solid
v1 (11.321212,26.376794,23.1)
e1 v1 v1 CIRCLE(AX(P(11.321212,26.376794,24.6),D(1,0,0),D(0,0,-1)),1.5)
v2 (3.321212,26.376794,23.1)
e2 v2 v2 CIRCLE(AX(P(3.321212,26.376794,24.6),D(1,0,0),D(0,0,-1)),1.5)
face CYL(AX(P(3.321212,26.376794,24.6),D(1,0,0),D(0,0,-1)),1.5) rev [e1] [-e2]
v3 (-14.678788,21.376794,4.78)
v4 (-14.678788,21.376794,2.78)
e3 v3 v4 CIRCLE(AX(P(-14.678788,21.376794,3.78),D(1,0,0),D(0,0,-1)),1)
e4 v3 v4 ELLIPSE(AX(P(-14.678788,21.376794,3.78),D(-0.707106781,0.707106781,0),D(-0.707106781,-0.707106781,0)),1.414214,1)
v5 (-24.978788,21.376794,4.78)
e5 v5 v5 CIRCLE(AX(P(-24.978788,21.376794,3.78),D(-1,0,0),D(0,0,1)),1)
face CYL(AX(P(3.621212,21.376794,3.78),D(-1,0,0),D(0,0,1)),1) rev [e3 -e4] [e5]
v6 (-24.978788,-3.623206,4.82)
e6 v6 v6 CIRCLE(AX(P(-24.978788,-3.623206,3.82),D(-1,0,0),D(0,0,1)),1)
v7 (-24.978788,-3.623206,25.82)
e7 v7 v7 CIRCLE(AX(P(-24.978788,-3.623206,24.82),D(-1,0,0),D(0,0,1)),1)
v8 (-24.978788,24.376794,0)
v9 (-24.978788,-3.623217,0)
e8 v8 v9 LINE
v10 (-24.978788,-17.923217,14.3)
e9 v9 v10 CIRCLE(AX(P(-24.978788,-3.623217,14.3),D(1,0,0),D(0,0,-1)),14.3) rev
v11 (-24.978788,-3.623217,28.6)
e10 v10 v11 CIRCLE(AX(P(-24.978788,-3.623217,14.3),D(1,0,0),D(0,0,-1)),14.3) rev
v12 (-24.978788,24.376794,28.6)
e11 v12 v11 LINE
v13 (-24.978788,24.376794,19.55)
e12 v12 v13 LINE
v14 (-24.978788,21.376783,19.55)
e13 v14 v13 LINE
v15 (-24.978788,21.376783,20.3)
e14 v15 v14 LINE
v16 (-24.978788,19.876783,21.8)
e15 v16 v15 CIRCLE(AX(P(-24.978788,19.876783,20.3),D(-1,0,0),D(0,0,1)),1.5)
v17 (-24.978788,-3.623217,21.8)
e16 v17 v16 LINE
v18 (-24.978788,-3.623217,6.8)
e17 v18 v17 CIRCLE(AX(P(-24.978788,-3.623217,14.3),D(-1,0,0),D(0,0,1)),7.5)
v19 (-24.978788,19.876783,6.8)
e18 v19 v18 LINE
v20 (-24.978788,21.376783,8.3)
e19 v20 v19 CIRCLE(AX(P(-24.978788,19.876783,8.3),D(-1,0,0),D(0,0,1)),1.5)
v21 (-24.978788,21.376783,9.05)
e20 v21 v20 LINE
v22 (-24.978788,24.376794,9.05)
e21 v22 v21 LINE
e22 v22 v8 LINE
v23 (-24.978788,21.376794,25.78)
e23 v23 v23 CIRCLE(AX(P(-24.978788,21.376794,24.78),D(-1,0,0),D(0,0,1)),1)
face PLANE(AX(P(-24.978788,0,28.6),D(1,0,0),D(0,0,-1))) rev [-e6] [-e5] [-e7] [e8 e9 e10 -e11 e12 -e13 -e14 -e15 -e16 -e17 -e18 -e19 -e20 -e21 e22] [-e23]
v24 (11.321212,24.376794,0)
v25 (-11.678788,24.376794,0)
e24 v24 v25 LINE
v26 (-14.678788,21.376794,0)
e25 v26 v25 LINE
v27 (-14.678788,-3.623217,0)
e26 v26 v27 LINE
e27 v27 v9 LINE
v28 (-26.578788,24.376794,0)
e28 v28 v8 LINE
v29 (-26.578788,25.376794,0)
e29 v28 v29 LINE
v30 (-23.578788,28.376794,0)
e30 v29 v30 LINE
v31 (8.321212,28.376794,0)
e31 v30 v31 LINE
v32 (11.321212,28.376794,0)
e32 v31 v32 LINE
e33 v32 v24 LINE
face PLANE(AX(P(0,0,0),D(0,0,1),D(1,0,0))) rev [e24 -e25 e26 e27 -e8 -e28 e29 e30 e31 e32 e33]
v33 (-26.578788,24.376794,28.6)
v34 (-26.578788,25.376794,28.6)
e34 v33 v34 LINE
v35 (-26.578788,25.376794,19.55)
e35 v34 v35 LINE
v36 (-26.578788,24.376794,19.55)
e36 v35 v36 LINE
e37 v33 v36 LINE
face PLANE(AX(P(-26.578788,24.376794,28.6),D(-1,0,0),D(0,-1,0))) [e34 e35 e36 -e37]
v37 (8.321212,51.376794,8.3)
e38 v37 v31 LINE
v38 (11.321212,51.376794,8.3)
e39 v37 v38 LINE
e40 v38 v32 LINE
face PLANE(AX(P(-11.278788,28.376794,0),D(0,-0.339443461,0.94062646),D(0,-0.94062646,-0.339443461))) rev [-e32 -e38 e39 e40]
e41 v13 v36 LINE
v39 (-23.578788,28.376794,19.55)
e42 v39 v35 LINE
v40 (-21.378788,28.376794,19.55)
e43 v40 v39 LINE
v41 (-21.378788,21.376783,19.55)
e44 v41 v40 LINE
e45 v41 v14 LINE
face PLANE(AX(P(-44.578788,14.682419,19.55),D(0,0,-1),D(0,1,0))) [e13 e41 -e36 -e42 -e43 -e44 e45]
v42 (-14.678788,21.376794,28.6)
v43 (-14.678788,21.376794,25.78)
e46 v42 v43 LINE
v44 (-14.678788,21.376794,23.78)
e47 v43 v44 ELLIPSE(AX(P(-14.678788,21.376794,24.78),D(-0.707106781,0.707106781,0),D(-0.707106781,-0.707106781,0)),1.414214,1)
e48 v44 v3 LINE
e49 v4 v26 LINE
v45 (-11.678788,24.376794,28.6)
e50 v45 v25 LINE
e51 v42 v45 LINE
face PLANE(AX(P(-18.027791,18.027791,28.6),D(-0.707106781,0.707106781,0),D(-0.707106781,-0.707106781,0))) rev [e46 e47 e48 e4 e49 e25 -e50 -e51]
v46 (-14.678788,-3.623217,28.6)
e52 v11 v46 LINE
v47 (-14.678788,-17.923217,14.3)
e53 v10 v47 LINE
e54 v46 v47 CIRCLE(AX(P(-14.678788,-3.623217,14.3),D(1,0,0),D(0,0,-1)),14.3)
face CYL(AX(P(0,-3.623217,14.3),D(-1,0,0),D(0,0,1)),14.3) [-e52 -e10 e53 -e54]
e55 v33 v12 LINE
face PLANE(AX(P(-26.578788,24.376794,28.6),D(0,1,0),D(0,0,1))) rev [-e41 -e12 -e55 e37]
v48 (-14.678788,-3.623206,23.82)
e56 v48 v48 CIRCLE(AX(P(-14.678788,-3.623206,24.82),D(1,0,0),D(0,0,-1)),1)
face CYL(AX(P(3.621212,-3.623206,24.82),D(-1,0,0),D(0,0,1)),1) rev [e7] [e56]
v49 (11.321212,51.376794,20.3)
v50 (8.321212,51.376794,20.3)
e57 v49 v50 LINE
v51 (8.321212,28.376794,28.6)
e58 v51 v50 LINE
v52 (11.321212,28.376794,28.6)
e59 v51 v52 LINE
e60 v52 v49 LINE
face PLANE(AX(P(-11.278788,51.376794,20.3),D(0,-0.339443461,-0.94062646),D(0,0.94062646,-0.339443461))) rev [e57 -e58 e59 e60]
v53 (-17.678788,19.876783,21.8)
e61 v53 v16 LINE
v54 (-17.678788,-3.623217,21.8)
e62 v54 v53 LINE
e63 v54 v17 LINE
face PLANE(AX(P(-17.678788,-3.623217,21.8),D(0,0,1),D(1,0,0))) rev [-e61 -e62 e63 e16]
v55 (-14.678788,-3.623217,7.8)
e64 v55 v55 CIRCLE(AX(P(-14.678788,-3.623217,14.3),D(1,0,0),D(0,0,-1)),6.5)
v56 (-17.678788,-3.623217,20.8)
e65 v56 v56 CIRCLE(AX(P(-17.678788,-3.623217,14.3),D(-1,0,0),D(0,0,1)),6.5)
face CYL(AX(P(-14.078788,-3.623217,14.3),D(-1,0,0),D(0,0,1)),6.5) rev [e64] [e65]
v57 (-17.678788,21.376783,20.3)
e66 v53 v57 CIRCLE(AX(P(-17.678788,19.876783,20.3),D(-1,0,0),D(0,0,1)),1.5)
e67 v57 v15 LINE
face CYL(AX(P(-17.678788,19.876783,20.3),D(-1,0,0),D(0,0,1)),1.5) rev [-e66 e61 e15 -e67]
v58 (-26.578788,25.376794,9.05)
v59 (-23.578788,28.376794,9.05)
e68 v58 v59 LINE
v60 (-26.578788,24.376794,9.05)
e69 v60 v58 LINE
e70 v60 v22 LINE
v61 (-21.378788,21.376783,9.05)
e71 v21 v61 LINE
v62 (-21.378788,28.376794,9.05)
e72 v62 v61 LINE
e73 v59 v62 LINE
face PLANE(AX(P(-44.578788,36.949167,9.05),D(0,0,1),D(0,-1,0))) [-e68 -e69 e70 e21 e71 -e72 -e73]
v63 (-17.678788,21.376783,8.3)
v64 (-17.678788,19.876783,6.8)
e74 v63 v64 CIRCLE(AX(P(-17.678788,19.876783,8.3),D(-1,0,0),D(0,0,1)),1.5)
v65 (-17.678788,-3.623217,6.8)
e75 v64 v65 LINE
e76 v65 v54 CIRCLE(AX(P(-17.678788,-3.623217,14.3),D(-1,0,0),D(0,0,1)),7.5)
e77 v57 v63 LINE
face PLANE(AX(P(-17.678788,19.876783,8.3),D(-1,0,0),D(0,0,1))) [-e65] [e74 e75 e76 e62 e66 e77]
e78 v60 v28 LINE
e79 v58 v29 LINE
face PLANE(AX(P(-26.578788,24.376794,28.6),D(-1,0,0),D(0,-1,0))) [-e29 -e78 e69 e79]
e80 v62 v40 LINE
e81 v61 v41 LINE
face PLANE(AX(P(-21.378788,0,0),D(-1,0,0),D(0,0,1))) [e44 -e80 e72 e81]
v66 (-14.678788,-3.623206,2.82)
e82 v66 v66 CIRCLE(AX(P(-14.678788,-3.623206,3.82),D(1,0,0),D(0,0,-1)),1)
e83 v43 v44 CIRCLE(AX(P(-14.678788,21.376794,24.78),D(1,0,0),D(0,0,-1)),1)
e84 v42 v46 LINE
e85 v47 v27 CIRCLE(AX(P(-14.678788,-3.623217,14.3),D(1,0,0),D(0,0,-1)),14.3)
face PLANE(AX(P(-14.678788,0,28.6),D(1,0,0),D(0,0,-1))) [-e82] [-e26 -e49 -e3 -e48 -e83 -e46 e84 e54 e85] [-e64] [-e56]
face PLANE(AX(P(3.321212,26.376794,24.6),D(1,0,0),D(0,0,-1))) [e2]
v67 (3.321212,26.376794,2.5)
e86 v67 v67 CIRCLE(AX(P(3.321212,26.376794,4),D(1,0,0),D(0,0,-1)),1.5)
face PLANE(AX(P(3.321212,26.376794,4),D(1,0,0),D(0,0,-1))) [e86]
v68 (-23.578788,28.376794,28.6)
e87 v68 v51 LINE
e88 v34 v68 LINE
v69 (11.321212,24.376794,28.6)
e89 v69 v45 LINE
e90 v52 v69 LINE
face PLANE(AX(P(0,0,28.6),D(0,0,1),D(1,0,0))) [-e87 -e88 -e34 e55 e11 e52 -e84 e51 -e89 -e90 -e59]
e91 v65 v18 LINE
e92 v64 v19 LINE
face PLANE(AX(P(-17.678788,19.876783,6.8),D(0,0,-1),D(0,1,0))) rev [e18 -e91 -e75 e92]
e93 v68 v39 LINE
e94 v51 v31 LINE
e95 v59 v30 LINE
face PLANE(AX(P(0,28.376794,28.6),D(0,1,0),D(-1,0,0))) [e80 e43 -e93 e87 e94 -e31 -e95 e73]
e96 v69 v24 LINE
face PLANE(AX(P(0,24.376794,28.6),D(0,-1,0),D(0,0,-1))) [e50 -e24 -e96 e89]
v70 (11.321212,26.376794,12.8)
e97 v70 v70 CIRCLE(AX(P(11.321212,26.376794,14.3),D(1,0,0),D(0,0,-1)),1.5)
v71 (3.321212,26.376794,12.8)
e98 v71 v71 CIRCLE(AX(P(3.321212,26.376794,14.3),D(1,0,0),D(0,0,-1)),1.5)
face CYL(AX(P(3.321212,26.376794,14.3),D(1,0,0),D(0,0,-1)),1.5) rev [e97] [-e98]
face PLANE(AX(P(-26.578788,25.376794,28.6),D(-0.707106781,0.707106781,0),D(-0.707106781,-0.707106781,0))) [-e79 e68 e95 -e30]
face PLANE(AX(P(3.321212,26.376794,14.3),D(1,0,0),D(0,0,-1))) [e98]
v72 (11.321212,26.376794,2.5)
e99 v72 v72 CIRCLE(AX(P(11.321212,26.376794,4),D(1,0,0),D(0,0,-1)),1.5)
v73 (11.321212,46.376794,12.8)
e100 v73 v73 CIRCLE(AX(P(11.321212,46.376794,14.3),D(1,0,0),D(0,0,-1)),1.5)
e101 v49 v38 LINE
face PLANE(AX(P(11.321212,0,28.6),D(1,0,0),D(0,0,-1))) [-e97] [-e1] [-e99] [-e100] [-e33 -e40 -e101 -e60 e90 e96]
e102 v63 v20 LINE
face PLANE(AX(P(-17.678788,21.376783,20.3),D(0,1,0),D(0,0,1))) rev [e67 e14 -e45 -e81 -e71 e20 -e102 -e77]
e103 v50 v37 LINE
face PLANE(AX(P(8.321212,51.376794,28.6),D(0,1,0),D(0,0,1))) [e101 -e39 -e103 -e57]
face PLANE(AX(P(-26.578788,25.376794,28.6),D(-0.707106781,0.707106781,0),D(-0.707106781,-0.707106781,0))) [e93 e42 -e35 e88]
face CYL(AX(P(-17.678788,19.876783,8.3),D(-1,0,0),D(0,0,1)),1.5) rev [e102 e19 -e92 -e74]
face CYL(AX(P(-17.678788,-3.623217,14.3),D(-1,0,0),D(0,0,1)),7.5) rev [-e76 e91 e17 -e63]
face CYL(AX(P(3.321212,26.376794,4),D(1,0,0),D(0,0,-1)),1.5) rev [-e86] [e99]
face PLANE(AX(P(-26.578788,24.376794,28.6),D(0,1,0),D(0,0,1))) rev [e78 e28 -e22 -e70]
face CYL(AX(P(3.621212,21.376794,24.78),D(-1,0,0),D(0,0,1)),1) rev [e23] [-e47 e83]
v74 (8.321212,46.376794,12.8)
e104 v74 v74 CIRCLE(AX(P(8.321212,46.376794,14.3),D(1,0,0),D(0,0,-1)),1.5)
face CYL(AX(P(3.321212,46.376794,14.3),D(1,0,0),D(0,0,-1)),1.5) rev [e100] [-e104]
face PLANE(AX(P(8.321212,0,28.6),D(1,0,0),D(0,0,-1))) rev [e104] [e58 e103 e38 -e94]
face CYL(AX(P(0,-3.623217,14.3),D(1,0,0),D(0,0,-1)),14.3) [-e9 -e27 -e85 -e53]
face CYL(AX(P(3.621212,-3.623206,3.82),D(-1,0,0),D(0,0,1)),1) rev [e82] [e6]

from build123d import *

# Parameters (mm, degrees)
EXTRUDE_1_DEPTH          = 28.6
SKETCH_2_R               = 1
CUT_EXTRUDE_1_DEPTH      = 28.6
FILLET_1_R               = 14.3
CUT_EXTRUDE_2_DEPTH      = 7.3
CUT_EXTRUDE_4_DEPTH      = 19.6
CUT_EXTRUDE_4_DEPTH_BACK = 3.6
SKETCH_4_W               = 10.5
SKETCH_4_H               = 22.266748583
SKETCH_5_R               = 6.5
CUT_EXTRUDE_5_DEPTH      = 3.6
CUT_EXTRUDE_6_DEPTH      = 22.6
SKETCH_7_R               = 1.5
CUT_EXTRUDE_7_DEPTH      = 8


with BuildPart() as part:
    # Model → 凸台-拉伸1 (new body)
    with BuildSketch(Plane.XY):
        Polygon((-24.978787879, -17.92321671), (-14.678787879, -17.92321671), (-14.678787879, 21.376794113), (-11.678787879, 24.376794113), (11.321212121, 24.376794113), (11.321212121, 51.376794114), (8.321212121, 51.376794114), (8.321212121, 28.376794114), (-23.578787879, 28.376794114), (-26.578787879, 25.376794114), (-26.578787879, 24.376794113), (-24.978787879, 24.376794113), align=None)
    extrude(amount=EXTRUDE_1_DEPTH)

    # 草图2 → 切除-拉伸1 (cut)
    with BuildSketch(Plane.ZY.offset(24.978787879)):
        with Locations((3.78, 21.376794113)):
            Circle(SKETCH_2_R)
        with Locations((24.78, 21.376794113)):
            Circle(SKETCH_2_R)
        with Locations((24.82, -3.623205887)):
            Circle(SKETCH_2_R)
        with Locations((3.82, -3.623205887)):
            Circle(SKETCH_2_R)
    extrude(amount=-CUT_EXTRUDE_1_DEPTH, mode=Mode.SUBTRACT)

    # 圆角1
    fillet_1_edges = [part.edges().sort_by_distance(p)[0] for p in [
        (-19.828787879, -17.92321671, 28.6),
        (-19.828787879, -17.92321671, 0),
    ]]
    fillet(fillet_1_edges, radius=FILLET_1_R - 0.0001)  # a hair under: the kernel refuses the full size

    # 草图3 → 切除-拉伸2 (cut)
    with BuildSketch(Plane.ZY.offset(24.978787879)):
        with BuildLine():
            Line((21.8, -3.62321671), (21.8, 19.87678329))
            ThreePointArc((21.8, 19.87678329), (21.360660172, 20.937443461), (20.3, 21.37678329))
            Line((20.3, 21.37678329), (8.3, 21.37678329))
            ThreePointArc((8.3, 21.37678329), (7.239339828, 20.937443461), (6.8, 19.87678329))
            Line((6.8, 19.87678329), (6.8, -3.62321671))
            ThreePointArc((6.8, -3.62321671), (14.3, -11.12321671), (21.8, -3.62321671))
        make_face()
    extrude(amount=-CUT_EXTRUDE_2_DEPTH, mode=Mode.SUBTRACT)

    # 草图4 → 切除-拉伸4 (cut, two sides: drawn at the far end of the back side and taken through both)
    with BuildSketch(Plane.ZY.offset(24.978787879).offset(-CUT_EXTRUDE_4_DEPTH_BACK)):
        with Locations((14.3, 25.815793082)):
            Rectangle(SKETCH_4_W, SKETCH_4_H)
    extrude(amount=CUT_EXTRUDE_4_DEPTH + CUT_EXTRUDE_4_DEPTH_BACK, mode=Mode.SUBTRACT)

    # 草图5 → 切除-拉伸5 (cut)
    with BuildSketch(Plane.ZY.offset(17.678787879)):
        with Locations((14.3, -3.62321671)):
            Circle(SKETCH_5_R)
    extrude(amount=-CUT_EXTRUDE_5_DEPTH, mode=Mode.SUBTRACT)

    # 草图6 → 切除-拉伸6 (cut)
    with BuildSketch(Plane(origin=(11.321212121, 0, 0), x_dir=(0, 0, -1), z_dir=(1, 0, 0))):
        Polygon((0, 28.376794114), (-8.3, 51.376794114), (5.727876299, 54.90154804), align=None)
        Polygon((-20.3, 51.376794114), (-28.6, 28.376794114), (-35.26481715, 54.90154804), align=None)
    extrude(amount=-CUT_EXTRUDE_6_DEPTH, mode=Mode.SUBTRACT)

    # 草图7 → 切除-拉伸7 (cut)
    with BuildSketch(Plane(origin=(11.321212121, 0, 0), x_dir=(0, 0, -1), z_dir=(1, 0, 0))):
        with Locations((-14.3, 46.376794114)):
            Circle(SKETCH_7_R)
        with Locations((-24.6, 26.376794113)):
            Circle(SKETCH_7_R)
        with Locations((-14.3, 26.376794113)):
            Circle(SKETCH_7_R)
        with Locations((-4, 26.376794113)):
            Circle(SKETCH_7_R)
    extrude(amount=-CUT_EXTRUDE_7_DEPTH, mode=Mode.SUBTRACT)


solid = part.part
